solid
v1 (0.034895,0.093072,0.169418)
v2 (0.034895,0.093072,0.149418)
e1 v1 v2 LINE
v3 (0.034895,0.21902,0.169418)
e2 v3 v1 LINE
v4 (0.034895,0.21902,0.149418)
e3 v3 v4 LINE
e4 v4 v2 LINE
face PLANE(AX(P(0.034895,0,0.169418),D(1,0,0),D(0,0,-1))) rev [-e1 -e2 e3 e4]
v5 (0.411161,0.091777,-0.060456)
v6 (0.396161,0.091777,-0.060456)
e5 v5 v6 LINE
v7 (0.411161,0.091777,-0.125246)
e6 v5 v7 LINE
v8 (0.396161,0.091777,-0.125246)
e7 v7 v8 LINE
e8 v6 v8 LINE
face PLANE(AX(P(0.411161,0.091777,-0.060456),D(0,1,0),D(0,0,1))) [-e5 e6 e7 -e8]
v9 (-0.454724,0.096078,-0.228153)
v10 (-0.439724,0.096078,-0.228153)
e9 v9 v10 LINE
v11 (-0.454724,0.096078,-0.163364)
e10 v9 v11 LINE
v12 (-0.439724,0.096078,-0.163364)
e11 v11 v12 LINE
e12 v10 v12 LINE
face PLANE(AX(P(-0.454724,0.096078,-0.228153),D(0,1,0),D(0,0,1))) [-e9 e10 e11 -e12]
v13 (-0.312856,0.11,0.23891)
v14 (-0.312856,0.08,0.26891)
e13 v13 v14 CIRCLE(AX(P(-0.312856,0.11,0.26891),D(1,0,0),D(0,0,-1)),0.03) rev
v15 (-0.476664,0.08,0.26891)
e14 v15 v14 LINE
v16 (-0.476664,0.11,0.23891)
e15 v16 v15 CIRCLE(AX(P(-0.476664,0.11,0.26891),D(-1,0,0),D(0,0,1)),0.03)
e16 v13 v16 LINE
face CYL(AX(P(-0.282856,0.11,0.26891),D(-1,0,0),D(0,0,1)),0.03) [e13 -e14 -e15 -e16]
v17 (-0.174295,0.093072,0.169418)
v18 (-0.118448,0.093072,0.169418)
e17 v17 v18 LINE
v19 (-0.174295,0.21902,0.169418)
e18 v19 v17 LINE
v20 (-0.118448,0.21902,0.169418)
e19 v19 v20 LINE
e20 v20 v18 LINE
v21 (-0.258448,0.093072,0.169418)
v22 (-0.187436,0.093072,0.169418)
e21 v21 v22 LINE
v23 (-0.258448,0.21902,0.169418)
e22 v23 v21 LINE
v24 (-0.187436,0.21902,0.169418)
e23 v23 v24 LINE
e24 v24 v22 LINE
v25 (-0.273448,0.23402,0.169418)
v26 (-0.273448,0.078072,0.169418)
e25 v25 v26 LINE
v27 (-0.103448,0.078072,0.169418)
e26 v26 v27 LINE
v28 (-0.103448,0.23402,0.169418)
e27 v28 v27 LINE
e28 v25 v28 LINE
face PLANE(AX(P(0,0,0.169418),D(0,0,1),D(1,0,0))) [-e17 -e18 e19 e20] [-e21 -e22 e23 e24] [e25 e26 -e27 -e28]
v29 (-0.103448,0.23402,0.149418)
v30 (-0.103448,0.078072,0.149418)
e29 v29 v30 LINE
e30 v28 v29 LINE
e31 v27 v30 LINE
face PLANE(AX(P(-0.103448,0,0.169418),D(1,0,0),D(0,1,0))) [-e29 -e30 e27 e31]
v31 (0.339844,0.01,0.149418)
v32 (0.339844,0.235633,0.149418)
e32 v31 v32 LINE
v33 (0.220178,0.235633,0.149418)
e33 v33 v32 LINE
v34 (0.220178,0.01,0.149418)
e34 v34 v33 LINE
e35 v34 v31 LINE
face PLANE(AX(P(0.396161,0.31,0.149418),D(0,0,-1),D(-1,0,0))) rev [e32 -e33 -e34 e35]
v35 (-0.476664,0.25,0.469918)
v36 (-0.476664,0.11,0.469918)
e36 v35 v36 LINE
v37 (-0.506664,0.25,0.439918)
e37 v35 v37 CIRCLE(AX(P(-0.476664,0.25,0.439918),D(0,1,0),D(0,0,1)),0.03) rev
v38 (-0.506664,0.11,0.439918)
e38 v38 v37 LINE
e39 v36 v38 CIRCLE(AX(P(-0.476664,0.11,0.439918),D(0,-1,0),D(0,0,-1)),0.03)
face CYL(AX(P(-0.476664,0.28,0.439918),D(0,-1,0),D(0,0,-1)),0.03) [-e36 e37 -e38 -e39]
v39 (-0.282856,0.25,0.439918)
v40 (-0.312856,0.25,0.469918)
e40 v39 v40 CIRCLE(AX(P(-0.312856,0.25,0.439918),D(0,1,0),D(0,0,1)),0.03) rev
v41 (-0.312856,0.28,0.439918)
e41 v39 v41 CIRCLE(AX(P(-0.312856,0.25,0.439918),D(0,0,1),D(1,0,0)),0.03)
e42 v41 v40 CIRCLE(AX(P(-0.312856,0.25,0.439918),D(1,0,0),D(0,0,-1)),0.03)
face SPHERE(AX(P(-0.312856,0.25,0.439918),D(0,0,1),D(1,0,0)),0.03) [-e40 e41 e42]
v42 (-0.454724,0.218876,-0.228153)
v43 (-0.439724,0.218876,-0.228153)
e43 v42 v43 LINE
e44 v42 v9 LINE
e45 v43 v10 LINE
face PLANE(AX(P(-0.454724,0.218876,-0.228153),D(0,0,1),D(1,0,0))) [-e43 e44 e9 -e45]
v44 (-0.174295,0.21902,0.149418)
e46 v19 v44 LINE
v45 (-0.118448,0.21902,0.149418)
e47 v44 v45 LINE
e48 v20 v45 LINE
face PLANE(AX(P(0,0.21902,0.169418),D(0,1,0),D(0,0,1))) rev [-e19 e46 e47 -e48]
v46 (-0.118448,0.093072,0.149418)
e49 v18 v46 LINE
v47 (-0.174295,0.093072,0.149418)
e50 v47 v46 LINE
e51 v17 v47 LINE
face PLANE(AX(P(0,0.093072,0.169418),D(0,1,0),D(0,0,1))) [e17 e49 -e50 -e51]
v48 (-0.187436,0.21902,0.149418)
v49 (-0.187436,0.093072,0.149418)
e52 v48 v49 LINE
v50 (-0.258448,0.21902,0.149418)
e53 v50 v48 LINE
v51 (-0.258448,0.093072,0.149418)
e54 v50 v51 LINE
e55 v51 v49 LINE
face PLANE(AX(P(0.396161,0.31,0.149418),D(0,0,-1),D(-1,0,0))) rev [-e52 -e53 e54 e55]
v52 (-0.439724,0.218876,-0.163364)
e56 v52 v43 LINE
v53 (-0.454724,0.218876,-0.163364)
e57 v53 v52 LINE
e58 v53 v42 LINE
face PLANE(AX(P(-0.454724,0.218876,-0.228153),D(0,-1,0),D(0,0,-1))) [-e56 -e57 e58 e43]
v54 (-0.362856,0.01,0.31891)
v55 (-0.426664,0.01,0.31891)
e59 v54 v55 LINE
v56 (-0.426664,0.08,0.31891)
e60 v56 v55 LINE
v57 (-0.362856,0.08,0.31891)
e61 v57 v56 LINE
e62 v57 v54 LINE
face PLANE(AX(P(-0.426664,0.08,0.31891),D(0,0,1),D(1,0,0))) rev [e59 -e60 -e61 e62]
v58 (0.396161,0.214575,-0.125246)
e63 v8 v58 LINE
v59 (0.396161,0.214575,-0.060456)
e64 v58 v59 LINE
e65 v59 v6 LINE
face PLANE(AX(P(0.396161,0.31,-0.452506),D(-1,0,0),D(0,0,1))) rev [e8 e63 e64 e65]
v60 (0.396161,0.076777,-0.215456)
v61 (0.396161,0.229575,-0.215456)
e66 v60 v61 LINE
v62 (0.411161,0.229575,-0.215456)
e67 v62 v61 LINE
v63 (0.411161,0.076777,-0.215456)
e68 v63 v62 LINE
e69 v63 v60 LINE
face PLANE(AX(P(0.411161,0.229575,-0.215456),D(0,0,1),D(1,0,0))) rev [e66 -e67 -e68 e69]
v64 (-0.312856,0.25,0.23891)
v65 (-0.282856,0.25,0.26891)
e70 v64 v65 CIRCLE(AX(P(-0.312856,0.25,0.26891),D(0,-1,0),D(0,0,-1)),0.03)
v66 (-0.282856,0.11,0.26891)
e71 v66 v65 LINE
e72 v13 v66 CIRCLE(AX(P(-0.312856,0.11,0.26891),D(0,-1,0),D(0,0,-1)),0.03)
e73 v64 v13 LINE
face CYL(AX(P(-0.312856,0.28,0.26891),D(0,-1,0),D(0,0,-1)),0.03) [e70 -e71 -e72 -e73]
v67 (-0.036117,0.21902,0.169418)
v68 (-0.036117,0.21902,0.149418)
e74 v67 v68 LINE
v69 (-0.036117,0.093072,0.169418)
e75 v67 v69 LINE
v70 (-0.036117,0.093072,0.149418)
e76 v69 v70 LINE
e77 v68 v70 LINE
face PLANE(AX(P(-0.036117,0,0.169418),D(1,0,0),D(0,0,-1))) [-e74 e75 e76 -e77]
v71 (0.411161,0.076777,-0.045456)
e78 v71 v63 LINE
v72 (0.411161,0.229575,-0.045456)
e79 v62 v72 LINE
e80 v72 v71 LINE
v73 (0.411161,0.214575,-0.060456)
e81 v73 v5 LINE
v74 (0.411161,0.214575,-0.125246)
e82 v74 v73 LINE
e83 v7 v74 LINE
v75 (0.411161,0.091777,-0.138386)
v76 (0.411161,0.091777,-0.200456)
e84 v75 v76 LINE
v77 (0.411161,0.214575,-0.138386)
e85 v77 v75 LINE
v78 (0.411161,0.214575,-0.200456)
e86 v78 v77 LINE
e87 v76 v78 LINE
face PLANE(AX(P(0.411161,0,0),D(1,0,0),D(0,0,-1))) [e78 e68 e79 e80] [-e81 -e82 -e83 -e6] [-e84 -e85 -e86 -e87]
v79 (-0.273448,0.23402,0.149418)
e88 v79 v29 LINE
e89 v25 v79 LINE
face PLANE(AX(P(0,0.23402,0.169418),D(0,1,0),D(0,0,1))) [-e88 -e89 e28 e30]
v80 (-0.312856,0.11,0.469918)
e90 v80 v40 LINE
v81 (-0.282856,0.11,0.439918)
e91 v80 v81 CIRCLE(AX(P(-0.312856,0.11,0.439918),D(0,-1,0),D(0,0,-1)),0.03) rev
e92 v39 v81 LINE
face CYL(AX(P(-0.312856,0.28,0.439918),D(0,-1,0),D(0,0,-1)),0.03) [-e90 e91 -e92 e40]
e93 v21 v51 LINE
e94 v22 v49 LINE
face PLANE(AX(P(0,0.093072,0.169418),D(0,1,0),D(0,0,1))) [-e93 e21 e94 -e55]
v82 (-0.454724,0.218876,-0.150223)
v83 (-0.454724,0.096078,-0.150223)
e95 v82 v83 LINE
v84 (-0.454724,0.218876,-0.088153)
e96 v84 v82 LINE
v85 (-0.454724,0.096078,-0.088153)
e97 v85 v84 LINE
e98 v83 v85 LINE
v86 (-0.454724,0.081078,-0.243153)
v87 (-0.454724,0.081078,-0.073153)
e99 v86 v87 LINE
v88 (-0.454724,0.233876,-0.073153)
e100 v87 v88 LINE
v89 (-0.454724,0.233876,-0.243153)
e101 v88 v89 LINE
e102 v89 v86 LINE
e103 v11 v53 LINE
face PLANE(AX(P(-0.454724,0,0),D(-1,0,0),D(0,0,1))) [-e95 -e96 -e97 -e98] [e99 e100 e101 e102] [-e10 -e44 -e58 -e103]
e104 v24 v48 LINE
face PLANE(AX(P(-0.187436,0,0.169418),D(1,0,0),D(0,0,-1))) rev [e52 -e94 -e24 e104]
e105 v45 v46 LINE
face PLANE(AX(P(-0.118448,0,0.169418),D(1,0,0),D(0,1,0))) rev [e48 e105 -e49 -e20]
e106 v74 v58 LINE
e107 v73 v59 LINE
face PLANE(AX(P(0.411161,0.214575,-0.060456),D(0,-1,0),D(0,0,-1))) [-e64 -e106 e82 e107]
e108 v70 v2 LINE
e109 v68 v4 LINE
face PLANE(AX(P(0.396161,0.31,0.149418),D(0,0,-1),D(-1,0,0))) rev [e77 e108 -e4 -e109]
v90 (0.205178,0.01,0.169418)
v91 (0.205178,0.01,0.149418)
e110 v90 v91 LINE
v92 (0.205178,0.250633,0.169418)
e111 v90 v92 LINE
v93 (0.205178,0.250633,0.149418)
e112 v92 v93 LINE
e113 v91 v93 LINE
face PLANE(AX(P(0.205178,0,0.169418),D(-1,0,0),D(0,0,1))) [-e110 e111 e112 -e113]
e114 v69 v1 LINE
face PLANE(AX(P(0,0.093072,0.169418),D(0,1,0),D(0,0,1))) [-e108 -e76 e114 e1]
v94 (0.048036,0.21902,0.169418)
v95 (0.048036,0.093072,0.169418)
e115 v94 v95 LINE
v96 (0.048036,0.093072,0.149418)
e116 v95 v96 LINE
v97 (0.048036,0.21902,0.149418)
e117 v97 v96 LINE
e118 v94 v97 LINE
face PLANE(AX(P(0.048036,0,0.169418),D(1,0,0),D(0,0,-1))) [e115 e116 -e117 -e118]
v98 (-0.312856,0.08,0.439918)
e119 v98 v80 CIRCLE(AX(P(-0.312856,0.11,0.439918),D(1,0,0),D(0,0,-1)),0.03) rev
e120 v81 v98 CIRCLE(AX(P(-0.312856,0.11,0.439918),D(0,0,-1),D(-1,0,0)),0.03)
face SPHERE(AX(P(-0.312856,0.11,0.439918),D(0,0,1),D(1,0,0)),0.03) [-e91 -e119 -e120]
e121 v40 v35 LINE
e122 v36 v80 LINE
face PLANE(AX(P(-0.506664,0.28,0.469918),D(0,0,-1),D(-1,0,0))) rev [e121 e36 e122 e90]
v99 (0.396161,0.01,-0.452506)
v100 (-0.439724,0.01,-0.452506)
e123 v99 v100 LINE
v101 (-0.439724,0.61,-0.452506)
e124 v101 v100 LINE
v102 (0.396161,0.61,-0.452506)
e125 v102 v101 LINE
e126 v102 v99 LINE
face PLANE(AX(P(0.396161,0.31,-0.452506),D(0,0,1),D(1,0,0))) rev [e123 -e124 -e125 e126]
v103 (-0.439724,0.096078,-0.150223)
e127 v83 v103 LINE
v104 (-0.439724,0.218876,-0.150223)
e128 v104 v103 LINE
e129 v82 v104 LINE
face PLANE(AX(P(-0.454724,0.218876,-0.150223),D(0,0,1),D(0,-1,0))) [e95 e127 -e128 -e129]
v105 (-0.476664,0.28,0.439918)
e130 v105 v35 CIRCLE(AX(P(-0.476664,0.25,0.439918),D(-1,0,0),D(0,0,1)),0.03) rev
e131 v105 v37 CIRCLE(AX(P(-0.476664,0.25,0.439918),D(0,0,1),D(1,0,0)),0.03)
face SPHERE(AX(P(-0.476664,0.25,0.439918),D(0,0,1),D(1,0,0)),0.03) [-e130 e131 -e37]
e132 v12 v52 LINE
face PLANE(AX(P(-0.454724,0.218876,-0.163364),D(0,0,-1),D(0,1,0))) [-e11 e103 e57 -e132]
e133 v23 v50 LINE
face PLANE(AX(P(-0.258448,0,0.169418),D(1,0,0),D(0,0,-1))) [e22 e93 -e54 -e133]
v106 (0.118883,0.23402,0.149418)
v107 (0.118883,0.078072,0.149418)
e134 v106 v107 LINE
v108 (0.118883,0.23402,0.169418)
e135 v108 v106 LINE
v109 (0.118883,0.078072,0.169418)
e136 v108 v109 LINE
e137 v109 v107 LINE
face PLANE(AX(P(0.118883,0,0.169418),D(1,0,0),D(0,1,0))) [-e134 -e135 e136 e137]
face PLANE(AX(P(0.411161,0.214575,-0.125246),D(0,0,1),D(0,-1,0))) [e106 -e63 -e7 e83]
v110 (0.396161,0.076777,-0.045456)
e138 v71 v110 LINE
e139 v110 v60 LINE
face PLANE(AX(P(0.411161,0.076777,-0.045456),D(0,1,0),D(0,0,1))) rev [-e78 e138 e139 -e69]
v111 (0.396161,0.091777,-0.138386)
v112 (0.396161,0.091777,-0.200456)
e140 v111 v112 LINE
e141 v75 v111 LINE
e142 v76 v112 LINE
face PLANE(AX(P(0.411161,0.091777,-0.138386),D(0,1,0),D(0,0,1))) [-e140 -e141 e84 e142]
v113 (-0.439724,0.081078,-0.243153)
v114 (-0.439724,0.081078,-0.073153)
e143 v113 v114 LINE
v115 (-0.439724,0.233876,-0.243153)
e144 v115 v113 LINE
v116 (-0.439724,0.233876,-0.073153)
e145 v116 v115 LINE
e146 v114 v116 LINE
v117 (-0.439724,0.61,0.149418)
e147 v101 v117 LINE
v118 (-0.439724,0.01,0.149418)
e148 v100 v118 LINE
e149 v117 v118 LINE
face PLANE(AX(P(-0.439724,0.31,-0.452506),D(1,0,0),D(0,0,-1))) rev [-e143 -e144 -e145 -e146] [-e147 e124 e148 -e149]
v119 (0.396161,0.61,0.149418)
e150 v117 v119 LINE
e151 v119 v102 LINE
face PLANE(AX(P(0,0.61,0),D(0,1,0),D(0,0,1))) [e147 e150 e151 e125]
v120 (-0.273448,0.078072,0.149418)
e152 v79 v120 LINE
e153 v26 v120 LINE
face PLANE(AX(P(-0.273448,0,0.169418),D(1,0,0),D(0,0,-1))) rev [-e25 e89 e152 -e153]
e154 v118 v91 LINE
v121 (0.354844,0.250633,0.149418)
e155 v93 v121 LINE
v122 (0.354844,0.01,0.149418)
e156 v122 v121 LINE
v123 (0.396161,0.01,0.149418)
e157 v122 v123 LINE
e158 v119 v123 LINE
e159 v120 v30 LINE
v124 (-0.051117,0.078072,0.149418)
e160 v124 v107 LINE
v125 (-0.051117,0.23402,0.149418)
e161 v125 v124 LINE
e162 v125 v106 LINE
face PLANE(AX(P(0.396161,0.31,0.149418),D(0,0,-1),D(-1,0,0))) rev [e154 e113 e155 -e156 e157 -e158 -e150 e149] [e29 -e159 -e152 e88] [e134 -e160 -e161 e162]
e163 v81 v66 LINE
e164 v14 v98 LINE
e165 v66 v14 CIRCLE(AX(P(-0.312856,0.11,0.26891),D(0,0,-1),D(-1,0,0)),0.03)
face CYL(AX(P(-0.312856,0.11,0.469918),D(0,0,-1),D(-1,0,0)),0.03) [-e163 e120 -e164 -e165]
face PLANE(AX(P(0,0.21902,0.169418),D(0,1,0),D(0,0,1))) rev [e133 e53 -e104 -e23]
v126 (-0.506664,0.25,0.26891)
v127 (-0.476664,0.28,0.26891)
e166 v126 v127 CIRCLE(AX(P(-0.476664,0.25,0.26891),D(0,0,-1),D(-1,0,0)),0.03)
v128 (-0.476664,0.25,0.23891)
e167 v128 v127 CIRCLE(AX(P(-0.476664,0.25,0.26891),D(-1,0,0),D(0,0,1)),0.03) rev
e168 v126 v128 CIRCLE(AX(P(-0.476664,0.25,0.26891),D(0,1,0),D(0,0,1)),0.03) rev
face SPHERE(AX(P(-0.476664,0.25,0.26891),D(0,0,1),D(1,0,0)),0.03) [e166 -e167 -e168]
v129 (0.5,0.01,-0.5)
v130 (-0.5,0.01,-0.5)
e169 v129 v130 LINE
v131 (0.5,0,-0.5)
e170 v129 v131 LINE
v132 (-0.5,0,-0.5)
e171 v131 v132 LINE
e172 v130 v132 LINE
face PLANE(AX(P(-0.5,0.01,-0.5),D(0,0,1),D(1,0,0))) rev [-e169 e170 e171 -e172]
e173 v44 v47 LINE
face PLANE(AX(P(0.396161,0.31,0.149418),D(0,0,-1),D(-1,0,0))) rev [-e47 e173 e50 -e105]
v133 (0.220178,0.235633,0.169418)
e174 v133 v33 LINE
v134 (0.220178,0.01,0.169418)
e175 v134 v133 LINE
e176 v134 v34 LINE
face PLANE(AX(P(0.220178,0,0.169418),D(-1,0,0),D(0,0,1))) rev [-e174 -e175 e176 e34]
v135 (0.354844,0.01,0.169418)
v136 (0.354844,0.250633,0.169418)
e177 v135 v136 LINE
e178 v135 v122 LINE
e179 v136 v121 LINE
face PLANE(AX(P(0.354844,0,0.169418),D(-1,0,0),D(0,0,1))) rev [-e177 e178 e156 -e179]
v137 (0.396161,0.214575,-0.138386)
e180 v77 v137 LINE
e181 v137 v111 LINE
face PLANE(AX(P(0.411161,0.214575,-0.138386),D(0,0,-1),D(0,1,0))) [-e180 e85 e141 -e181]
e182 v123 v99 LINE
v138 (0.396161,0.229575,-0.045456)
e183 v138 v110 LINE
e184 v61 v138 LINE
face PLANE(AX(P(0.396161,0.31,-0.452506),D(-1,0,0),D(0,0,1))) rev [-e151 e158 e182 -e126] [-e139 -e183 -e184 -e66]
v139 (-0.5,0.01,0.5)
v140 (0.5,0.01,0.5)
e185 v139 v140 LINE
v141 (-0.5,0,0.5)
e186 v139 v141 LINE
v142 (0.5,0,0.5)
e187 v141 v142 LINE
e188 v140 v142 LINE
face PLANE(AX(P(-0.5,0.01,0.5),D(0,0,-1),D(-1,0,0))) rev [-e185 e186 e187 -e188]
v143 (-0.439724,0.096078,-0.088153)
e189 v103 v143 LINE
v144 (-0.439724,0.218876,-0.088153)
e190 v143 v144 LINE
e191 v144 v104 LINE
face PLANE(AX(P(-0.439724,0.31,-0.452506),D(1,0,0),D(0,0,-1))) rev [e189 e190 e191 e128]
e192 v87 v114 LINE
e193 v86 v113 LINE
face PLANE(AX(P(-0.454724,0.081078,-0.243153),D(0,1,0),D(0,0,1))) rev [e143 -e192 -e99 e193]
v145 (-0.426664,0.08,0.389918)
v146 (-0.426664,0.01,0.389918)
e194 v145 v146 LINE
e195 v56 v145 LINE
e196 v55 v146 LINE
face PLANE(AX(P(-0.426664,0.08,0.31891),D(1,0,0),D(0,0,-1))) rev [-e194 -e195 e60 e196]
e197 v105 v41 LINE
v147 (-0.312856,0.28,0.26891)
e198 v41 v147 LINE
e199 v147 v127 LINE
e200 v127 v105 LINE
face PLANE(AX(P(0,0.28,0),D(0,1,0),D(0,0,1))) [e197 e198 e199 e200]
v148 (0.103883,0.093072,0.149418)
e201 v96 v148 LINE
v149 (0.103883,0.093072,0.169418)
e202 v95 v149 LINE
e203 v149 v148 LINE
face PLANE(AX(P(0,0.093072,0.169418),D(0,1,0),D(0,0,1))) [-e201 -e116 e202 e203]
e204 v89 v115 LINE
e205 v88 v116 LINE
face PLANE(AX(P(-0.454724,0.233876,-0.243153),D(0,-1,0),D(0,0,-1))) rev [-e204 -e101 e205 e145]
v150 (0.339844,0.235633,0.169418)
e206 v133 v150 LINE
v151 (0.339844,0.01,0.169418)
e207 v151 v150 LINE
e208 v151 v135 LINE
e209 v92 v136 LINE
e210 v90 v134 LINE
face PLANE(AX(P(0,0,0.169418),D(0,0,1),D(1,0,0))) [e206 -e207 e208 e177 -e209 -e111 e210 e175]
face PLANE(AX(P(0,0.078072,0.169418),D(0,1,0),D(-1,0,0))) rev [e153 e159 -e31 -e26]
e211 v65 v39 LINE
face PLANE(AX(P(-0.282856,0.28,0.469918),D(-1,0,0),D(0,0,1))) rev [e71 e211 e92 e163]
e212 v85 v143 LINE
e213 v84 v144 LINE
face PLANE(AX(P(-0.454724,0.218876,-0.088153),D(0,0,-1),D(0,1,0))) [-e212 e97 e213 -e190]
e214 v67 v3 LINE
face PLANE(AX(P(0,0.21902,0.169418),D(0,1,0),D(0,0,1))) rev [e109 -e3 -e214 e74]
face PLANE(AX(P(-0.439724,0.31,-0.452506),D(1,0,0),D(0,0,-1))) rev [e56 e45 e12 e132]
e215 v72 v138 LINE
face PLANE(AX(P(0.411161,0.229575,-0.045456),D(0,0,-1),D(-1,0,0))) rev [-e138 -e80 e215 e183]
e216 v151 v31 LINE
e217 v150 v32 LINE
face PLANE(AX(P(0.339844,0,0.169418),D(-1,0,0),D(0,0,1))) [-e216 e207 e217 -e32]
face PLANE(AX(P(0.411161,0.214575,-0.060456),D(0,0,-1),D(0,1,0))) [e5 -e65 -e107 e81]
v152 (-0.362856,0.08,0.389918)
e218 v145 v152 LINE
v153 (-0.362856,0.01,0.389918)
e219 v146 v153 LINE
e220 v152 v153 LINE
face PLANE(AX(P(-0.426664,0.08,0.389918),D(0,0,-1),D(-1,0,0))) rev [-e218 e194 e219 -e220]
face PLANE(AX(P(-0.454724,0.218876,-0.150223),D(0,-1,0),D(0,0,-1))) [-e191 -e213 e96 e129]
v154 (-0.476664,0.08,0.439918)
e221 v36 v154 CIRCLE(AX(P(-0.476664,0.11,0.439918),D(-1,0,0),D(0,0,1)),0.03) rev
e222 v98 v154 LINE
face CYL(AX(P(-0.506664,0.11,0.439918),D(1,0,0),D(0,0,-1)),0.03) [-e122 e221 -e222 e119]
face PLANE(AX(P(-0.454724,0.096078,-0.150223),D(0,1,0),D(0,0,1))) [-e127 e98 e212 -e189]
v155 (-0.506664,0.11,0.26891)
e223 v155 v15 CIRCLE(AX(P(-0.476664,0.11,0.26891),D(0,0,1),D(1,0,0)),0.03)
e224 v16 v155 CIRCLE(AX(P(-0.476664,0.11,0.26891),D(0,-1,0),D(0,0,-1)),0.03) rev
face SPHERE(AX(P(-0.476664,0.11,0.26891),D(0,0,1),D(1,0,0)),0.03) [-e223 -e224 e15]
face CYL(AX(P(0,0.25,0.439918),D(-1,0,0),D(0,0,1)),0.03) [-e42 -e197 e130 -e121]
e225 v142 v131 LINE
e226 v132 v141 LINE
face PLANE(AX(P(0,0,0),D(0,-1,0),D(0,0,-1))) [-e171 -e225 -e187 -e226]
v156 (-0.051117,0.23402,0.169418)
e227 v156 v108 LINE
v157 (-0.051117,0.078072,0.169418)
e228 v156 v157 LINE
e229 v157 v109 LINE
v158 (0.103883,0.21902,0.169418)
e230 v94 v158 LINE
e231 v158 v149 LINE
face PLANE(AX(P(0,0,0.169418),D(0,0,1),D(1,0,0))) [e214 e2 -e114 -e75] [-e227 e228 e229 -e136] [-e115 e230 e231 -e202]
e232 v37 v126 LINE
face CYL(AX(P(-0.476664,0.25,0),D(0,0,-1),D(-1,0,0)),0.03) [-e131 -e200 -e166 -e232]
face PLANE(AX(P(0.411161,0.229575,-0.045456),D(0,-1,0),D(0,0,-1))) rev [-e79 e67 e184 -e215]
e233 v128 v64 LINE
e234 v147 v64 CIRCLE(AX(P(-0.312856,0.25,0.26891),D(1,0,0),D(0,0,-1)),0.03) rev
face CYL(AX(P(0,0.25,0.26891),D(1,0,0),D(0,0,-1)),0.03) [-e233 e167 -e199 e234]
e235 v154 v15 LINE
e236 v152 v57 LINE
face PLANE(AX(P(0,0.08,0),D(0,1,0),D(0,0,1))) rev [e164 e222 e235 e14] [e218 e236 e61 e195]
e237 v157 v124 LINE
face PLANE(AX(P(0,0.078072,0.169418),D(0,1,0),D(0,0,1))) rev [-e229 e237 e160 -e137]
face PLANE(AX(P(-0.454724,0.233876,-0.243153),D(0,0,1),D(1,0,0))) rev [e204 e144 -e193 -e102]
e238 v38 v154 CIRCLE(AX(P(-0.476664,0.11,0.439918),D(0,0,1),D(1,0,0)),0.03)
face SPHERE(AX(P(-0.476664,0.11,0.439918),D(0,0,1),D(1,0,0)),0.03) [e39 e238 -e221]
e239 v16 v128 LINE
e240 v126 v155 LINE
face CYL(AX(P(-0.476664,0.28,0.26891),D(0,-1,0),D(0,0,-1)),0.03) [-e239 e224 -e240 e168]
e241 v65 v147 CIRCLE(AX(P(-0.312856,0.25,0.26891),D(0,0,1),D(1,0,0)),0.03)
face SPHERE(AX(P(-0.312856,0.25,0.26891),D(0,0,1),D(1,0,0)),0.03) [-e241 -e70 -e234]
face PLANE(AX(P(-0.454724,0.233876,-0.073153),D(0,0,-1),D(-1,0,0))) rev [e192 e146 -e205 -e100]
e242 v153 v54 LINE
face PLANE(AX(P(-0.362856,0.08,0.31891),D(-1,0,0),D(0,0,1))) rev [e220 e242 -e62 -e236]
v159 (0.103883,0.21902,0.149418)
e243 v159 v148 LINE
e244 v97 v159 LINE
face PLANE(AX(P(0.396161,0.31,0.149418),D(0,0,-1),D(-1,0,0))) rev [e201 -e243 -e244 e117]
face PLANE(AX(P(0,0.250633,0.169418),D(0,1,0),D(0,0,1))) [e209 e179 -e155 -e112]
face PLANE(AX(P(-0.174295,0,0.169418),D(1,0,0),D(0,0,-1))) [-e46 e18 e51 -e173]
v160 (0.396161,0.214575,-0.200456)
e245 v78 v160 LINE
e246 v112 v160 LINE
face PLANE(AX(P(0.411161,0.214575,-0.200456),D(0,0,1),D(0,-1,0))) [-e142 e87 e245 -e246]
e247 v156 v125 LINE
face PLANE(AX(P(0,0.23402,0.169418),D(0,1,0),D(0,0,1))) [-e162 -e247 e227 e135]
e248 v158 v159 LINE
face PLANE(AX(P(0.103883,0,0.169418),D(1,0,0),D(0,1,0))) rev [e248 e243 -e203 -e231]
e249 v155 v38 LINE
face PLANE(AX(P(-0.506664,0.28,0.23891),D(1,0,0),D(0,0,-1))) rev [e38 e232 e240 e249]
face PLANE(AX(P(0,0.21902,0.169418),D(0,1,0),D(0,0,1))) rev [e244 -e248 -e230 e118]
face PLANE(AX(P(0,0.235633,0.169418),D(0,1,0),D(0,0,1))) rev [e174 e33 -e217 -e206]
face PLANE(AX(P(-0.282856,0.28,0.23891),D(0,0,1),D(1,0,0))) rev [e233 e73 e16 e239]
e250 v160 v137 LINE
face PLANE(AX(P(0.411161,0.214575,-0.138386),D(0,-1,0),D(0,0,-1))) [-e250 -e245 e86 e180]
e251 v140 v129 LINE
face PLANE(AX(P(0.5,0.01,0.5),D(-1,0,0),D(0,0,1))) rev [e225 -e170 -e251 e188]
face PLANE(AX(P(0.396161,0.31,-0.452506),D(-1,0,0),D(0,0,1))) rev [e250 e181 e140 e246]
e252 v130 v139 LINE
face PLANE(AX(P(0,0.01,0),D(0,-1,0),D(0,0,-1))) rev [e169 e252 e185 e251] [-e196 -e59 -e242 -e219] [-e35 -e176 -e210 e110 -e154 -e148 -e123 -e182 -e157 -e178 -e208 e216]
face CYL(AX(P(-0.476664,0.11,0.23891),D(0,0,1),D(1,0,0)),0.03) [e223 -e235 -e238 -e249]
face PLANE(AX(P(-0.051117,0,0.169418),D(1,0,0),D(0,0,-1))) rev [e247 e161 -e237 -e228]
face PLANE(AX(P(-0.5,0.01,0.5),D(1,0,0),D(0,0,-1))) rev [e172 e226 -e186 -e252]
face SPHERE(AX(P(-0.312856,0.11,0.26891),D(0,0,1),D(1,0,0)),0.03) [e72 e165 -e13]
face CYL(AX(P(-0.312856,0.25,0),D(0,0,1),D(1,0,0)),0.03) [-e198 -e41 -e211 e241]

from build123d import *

# Parameters (mm, degrees)
ESBO_O1_W                 = 1
ESBO_O1_H                 = 1
RESSALTO_EXTRUS_O1_DEPTH  = 0.01
ESBO_O2_W                 = 0.835884883
ESBO_O2_H                 = 0.601923969
RESSALTO_EXTRUS_O3_DEPTH  = 0.3
ESBO_O8_W                 = 0.17
ESBO_O8_H                 = 0.1527975
ESBO_O8_W_2               = 0.064789378
ESBO_O8_H_2               = 0.1227975
ESBO_O8_W_3               = 0.0620701
RESSALTO_EXTRUS_O7_DEPTH  = 0.015
ESBO_O7_W                 = 0.17
ESBO_O7_H                 = 0.1527975
ESBO_O7_W_2               = 0.064789378
ESBO_O7_H_2               = 0.1227975
ESBO_O7_W_3               = 0.0620701
RESSALTO_EXTRUS_O8_DEPTH  = 0.015
ESBO_O9_W                 = 0.063807516
ESBO_O9_H                 = 0.071007721
RESSALTO_EXTRUS_O10_DEPTH = 0.07
ESBO_O11_W                = 0.223807516
ESBO_O11_H                = 0.231007721
RESSALTO_EXTRUS_O11_DEPTH = 0.2
FILETE2_R                 = 0.03
FILETE3_R                 = 0.03
ESBO_O6_W                 = 0.17
ESBO_O6_H                 = 0.15594777
ESBO_O6_W_2               = 0.055847654
ESBO_O6_H_2               = 0.12594777
ESBO_O6_W_3               = 0.071011824
ESBO_O6_W_4               = 0.055847655
ESBO_O6_W_5               = 0.071011823
RESSALTO_EXTRUS_O12_DEPTH = 0.02
ESBO_O12_W                = 0.835884883
ESBO_O12_H                = 0.601923969
RESSALTO_EXTRUS_O13_DEPTH = 0.3


with BuildPart() as part:
    # Esboço1 → Ressalto-extrusão1 (new body)
    with BuildSketch(Plane(origin=(0, 0, 0), x_dir=(1, 0, 0), z_dir=(0, 1, 0))):
        Rectangle(ESBO_O1_W, ESBO_O1_H)
    extrude(amount=RESSALTO_EXTRUS_O1_DEPTH)

    # Esboço2 → Ressalto-extrusão3 (add)
    with BuildSketch(Plane(origin=(0, 0.01, 0), x_dir=(1, 0, 0), z_dir=(0, 1, 0))):
        with Locations((-0.021781552, 0.151543531)):
            Rectangle(ESBO_O2_W, ESBO_O2_H)
    extrude(amount=RESSALTO_EXTRUS_O3_DEPTH)

    # Esboço8 → Ressalto-extrusão7 (add)
    with BuildSketch(Plane(origin=(0.396160889, 0, 0), x_dir=(0, 0, -1), z_dir=(1, 0, 0))):
        with Locations((0.130456206, 0.153176171)):
            Rectangle(ESBO_O8_W, ESBO_O8_H)
        with Locations((0.092850895, 0.153176171)):
            Rectangle(ESBO_O8_W_2, ESBO_O8_H_2, mode=Mode.SUBTRACT)
        with Locations((0.169421156, 0.153176171)):
            Rectangle(ESBO_O8_W_3, ESBO_O8_H_2, mode=Mode.SUBTRACT)
    extrude(amount=RESSALTO_EXTRUS_O7_DEPTH)

    # Esboço7 → Ressalto-extrusão8 (add)
    with BuildSketch(Plane.ZY.offset(0.439723994)):
        with Locations((-0.158153325, 0.157477131)):
            Rectangle(ESBO_O7_W, ESBO_O7_H)
        with Locations((-0.195758636, 0.157477131)):
            Rectangle(ESBO_O7_W_2, ESBO_O7_H_2, mode=Mode.SUBTRACT)
        with Locations((-0.119188375, 0.157477131)):
            Rectangle(ESBO_O7_W_3, ESBO_O7_H_2, mode=Mode.SUBTRACT)
    extrude(amount=RESSALTO_EXTRUS_O8_DEPTH)

    # Esboço9 → Ressalto-extrusão10 (add)
    with BuildSketch(Plane(origin=(0, 0.01, 0), x_dir=(1, 0, 0), z_dir=(0, 1, 0))):
        with Locations((-0.394760136, -0.354413696)):
            Rectangle(ESBO_O9_W, ESBO_O9_H)
    extrude(amount=RESSALTO_EXTRUS_O10_DEPTH)

    # Esboço11 → Ressalto-extrusão11 (add)
    with BuildSketch(Plane(origin=(0, 0.08, 0), x_dir=(1, 0, 0), z_dir=(0, 1, 0))):
        with Locations((-0.394760136, -0.354413696)):
            Rectangle(ESBO_O11_W, ESBO_O11_H)
    extrude(amount=RESSALTO_EXTRUS_O11_DEPTH)

    # Filete2
    filete2_edges = [part.edges().sort_by_distance(p)[0] for p in [
        (-0.506663894, 0.08, 0.354413695),
        (-0.506663894, 0.18, 0.238909835),
        (-0.394760136, 0.08, 0.469917556),
        (-0.506663894, 0.18, 0.469917556),
        (-0.282856378, 0.18, 0.469917556),
        (-0.394760136, 0.28, 0.238909835),
        (-0.506663894, 0.28, 0.354413695),
        (-0.394760136, 0.28, 0.469917556),
        (-0.282856378, 0.28, 0.354413695),
    ]]
    fillet(filete2_edges, radius=FILETE2_R)

    # Filete3
    # the kernel refuses this fillet: 0.03 mm, written as the material it takes off along each edge
    with BuildSketch(Plane(origin=(-0.476663894, 0.11, 0.268909835), x_dir=(0, 0, -1), z_dir=(0, -1, 0))) as filete3_piece_1_section:
        Polygon((0, 0), (FILETE3_R, 0), (FILETE3_R, -FILETE3_R), (0, -FILETE3_R), align=None)
    filete3_piece_1 = extrude(amount=FILETE3_R, mode=Mode.PRIVATE)
    filete3_piece_1 = filete3_piece_1 - Plane(origin=(-0.476663894, 0.11, 0.268909835), x_dir=(0.7071067811865475, 0, 0.7071067811865475), z_dir=(0, -1, 0)) * Sphere(FILETE3_R, mode=Mode.PRIVATE)
    add(filete3_piece_1, mode=Mode.SUBTRACT)
    with BuildSketch(Plane(origin=(-0.312856378, 0.25, 0.268909835), x_dir=(1, 0, 0), z_dir=(0, 0, -1))) as filete3_piece_2_section:
        Polygon((0, 0), (FILETE3_R, 0), (FILETE3_R, -FILETE3_R), (0, -FILETE3_R), align=None)
    filete3_piece_2 = extrude(amount=FILETE3_R, mode=Mode.PRIVATE)
    filete3_piece_2 = filete3_piece_2 - Plane(origin=(-0.312856378, 0.25, 0.268909835), x_dir=(-0.7071067811865475, -0.7071067811865475, 0), z_dir=(0, 0, -1)) * Sphere(FILETE3_R, mode=Mode.PRIVATE)
    add(filete3_piece_2, mode=Mode.SUBTRACT)
    with BuildSketch(Plane(origin=(-0.312856378, 0.11, 0.439917556), x_dir=(1, 0, 0), z_dir=(0, -1, 0))) as filete3_piece_3_section:
        Polygon((0, 0), (FILETE3_R, 0), (FILETE3_R, FILETE3_R), (0, FILETE3_R), align=None)
    filete3_piece_3 = extrude(amount=FILETE3_R, mode=Mode.PRIVATE)
    filete3_piece_3 = filete3_piece_3 - Plane(origin=(-0.312856378, 0.11, 0.439917556), x_dir=(-0.7071067811865475, 0, -0.7071067811865475), z_dir=(0, -1, 0)) * Sphere(FILETE3_R, mode=Mode.PRIVATE)
    add(filete3_piece_3, mode=Mode.SUBTRACT)
    with BuildSketch(Plane(origin=(-0.312856378, 0.11, 0.268909835), x_dir=(0, -1, 0), z_dir=(1, 0, 0))) as filete3_piece_4_section:
        Polygon((0, 0), (FILETE3_R, 0), (FILETE3_R, FILETE3_R), (0, FILETE3_R), align=None)
    filete3_piece_4 = extrude(amount=FILETE3_R, mode=Mode.PRIVATE)
    filete3_piece_4 = filete3_piece_4 - Plane(origin=(-0.312856378, 0.11, 0.268909835), x_dir=(0, 0.7071067811865475, 0.7071067811865475), z_dir=(1, 0, 0)) * Sphere(FILETE3_R, mode=Mode.PRIVATE)
    add(filete3_piece_4, mode=Mode.SUBTRACT)
    with BuildSketch(Plane(origin=(-0.312856378, 0.08, 0.238909835), x_dir=(0, 0, 1), z_dir=(-1, 0, 0))) as filete3_piece_5:
        with BuildLine():
            CenterArc((FILETE3_R, FILETE3_R), FILETE3_R, 180, 90)
            Line((0, FILETE3_R), (0, 0))
            Line((0, 0), (FILETE3_R, 0))
        make_face()
    extrude(amount=0.163807516, mode=Mode.SUBTRACT)
    with BuildSketch(Plane(origin=(-0.282856378, 0.08, 0.439917556), x_dir=(-1, 0, 0), z_dir=(0, 0, -1))) as filete3_piece_6:
        with BuildLine():
            CenterArc((FILETE3_R, FILETE3_R), FILETE3_R, 180, 90)
            Line((0, FILETE3_R), (0, 0))
            Line((0, 0), (FILETE3_R, 0))
        make_face()
    extrude(amount=0.171007722, mode=Mode.SUBTRACT)
    with BuildSketch(Plane(origin=(-0.282856378, 0.11, 0.238909835), x_dir=(-1, 0, 0), z_dir=(0, 1, 0))) as filete3_piece_7:
        with BuildLine():
            CenterArc((FILETE3_R, FILETE3_R), FILETE3_R, 180, 90)
            Line((0, FILETE3_R), (0, 0))
            Line((0, 0), (FILETE3_R, 0))
        make_face()
    extrude(amount=0.14, mode=Mode.SUBTRACT)

    # Esboço6 → Ressalto-extrusão12 (add)
    # profile 1 of 3: a face of its own
    with BuildSketch(Plane.XY.offset(0.149418454)):
        with Locations((0.033883439, 0.156046001)):
            Rectangle(ESBO_O6_W, ESBO_O6_H)
        with Locations((0.075959612, 0.156046001)):
            Rectangle(ESBO_O6_W_2, ESBO_O6_H_2, mode=Mode.SUBTRACT)
        with Locations((-0.000610649, 0.156046001)):
            Rectangle(ESBO_O6_W_3, ESBO_O6_H_2, mode=Mode.SUBTRACT)
    # profile 2 of 3: a face of its own
    with BuildSketch(Plane.XY.offset(0.149418454)):
        Polygon((0.205177687, 0.01), (0.220177687, 0.01), (0.220177687, 0.235633321), (0.339843806, 0.235633321), (0.339843806, 0.01), (0.354843806, 0.01), (0.354843806, 0.250633321), (0.205177687, 0.250633321), align=None)
    # profile 3 of 3: a face of its own
    with BuildSketch(Plane.XY.offset(0.149418454)):
        with Locations((-0.188447602, 0.156046001)):
            Rectangle(ESBO_O6_W, ESBO_O6_H)
        with Locations((-0.14637143, 0.156046001)):
            Rectangle(ESBO_O6_W_4, ESBO_O6_H_2, mode=Mode.SUBTRACT)
        with Locations((-0.222941691, 0.156046001)):
            Rectangle(ESBO_O6_W_5, ESBO_O6_H_2, mode=Mode.SUBTRACT)
    extrude(amount=RESSALTO_EXTRUS_O12_DEPTH)

    # Esboço12 → Ressalto-extrusão13 (add)
    with BuildSketch(Plane(origin=(0, 0.31, 0), x_dir=(1, 0, 0), z_dir=(0, 1, 0))):
        with Locations((-0.021781552, 0.151543531)):
            Rectangle(ESBO_O12_W, ESBO_O12_H)
    extrude(amount=RESSALTO_EXTRUS_O13_DEPTH)


solid = part.part
